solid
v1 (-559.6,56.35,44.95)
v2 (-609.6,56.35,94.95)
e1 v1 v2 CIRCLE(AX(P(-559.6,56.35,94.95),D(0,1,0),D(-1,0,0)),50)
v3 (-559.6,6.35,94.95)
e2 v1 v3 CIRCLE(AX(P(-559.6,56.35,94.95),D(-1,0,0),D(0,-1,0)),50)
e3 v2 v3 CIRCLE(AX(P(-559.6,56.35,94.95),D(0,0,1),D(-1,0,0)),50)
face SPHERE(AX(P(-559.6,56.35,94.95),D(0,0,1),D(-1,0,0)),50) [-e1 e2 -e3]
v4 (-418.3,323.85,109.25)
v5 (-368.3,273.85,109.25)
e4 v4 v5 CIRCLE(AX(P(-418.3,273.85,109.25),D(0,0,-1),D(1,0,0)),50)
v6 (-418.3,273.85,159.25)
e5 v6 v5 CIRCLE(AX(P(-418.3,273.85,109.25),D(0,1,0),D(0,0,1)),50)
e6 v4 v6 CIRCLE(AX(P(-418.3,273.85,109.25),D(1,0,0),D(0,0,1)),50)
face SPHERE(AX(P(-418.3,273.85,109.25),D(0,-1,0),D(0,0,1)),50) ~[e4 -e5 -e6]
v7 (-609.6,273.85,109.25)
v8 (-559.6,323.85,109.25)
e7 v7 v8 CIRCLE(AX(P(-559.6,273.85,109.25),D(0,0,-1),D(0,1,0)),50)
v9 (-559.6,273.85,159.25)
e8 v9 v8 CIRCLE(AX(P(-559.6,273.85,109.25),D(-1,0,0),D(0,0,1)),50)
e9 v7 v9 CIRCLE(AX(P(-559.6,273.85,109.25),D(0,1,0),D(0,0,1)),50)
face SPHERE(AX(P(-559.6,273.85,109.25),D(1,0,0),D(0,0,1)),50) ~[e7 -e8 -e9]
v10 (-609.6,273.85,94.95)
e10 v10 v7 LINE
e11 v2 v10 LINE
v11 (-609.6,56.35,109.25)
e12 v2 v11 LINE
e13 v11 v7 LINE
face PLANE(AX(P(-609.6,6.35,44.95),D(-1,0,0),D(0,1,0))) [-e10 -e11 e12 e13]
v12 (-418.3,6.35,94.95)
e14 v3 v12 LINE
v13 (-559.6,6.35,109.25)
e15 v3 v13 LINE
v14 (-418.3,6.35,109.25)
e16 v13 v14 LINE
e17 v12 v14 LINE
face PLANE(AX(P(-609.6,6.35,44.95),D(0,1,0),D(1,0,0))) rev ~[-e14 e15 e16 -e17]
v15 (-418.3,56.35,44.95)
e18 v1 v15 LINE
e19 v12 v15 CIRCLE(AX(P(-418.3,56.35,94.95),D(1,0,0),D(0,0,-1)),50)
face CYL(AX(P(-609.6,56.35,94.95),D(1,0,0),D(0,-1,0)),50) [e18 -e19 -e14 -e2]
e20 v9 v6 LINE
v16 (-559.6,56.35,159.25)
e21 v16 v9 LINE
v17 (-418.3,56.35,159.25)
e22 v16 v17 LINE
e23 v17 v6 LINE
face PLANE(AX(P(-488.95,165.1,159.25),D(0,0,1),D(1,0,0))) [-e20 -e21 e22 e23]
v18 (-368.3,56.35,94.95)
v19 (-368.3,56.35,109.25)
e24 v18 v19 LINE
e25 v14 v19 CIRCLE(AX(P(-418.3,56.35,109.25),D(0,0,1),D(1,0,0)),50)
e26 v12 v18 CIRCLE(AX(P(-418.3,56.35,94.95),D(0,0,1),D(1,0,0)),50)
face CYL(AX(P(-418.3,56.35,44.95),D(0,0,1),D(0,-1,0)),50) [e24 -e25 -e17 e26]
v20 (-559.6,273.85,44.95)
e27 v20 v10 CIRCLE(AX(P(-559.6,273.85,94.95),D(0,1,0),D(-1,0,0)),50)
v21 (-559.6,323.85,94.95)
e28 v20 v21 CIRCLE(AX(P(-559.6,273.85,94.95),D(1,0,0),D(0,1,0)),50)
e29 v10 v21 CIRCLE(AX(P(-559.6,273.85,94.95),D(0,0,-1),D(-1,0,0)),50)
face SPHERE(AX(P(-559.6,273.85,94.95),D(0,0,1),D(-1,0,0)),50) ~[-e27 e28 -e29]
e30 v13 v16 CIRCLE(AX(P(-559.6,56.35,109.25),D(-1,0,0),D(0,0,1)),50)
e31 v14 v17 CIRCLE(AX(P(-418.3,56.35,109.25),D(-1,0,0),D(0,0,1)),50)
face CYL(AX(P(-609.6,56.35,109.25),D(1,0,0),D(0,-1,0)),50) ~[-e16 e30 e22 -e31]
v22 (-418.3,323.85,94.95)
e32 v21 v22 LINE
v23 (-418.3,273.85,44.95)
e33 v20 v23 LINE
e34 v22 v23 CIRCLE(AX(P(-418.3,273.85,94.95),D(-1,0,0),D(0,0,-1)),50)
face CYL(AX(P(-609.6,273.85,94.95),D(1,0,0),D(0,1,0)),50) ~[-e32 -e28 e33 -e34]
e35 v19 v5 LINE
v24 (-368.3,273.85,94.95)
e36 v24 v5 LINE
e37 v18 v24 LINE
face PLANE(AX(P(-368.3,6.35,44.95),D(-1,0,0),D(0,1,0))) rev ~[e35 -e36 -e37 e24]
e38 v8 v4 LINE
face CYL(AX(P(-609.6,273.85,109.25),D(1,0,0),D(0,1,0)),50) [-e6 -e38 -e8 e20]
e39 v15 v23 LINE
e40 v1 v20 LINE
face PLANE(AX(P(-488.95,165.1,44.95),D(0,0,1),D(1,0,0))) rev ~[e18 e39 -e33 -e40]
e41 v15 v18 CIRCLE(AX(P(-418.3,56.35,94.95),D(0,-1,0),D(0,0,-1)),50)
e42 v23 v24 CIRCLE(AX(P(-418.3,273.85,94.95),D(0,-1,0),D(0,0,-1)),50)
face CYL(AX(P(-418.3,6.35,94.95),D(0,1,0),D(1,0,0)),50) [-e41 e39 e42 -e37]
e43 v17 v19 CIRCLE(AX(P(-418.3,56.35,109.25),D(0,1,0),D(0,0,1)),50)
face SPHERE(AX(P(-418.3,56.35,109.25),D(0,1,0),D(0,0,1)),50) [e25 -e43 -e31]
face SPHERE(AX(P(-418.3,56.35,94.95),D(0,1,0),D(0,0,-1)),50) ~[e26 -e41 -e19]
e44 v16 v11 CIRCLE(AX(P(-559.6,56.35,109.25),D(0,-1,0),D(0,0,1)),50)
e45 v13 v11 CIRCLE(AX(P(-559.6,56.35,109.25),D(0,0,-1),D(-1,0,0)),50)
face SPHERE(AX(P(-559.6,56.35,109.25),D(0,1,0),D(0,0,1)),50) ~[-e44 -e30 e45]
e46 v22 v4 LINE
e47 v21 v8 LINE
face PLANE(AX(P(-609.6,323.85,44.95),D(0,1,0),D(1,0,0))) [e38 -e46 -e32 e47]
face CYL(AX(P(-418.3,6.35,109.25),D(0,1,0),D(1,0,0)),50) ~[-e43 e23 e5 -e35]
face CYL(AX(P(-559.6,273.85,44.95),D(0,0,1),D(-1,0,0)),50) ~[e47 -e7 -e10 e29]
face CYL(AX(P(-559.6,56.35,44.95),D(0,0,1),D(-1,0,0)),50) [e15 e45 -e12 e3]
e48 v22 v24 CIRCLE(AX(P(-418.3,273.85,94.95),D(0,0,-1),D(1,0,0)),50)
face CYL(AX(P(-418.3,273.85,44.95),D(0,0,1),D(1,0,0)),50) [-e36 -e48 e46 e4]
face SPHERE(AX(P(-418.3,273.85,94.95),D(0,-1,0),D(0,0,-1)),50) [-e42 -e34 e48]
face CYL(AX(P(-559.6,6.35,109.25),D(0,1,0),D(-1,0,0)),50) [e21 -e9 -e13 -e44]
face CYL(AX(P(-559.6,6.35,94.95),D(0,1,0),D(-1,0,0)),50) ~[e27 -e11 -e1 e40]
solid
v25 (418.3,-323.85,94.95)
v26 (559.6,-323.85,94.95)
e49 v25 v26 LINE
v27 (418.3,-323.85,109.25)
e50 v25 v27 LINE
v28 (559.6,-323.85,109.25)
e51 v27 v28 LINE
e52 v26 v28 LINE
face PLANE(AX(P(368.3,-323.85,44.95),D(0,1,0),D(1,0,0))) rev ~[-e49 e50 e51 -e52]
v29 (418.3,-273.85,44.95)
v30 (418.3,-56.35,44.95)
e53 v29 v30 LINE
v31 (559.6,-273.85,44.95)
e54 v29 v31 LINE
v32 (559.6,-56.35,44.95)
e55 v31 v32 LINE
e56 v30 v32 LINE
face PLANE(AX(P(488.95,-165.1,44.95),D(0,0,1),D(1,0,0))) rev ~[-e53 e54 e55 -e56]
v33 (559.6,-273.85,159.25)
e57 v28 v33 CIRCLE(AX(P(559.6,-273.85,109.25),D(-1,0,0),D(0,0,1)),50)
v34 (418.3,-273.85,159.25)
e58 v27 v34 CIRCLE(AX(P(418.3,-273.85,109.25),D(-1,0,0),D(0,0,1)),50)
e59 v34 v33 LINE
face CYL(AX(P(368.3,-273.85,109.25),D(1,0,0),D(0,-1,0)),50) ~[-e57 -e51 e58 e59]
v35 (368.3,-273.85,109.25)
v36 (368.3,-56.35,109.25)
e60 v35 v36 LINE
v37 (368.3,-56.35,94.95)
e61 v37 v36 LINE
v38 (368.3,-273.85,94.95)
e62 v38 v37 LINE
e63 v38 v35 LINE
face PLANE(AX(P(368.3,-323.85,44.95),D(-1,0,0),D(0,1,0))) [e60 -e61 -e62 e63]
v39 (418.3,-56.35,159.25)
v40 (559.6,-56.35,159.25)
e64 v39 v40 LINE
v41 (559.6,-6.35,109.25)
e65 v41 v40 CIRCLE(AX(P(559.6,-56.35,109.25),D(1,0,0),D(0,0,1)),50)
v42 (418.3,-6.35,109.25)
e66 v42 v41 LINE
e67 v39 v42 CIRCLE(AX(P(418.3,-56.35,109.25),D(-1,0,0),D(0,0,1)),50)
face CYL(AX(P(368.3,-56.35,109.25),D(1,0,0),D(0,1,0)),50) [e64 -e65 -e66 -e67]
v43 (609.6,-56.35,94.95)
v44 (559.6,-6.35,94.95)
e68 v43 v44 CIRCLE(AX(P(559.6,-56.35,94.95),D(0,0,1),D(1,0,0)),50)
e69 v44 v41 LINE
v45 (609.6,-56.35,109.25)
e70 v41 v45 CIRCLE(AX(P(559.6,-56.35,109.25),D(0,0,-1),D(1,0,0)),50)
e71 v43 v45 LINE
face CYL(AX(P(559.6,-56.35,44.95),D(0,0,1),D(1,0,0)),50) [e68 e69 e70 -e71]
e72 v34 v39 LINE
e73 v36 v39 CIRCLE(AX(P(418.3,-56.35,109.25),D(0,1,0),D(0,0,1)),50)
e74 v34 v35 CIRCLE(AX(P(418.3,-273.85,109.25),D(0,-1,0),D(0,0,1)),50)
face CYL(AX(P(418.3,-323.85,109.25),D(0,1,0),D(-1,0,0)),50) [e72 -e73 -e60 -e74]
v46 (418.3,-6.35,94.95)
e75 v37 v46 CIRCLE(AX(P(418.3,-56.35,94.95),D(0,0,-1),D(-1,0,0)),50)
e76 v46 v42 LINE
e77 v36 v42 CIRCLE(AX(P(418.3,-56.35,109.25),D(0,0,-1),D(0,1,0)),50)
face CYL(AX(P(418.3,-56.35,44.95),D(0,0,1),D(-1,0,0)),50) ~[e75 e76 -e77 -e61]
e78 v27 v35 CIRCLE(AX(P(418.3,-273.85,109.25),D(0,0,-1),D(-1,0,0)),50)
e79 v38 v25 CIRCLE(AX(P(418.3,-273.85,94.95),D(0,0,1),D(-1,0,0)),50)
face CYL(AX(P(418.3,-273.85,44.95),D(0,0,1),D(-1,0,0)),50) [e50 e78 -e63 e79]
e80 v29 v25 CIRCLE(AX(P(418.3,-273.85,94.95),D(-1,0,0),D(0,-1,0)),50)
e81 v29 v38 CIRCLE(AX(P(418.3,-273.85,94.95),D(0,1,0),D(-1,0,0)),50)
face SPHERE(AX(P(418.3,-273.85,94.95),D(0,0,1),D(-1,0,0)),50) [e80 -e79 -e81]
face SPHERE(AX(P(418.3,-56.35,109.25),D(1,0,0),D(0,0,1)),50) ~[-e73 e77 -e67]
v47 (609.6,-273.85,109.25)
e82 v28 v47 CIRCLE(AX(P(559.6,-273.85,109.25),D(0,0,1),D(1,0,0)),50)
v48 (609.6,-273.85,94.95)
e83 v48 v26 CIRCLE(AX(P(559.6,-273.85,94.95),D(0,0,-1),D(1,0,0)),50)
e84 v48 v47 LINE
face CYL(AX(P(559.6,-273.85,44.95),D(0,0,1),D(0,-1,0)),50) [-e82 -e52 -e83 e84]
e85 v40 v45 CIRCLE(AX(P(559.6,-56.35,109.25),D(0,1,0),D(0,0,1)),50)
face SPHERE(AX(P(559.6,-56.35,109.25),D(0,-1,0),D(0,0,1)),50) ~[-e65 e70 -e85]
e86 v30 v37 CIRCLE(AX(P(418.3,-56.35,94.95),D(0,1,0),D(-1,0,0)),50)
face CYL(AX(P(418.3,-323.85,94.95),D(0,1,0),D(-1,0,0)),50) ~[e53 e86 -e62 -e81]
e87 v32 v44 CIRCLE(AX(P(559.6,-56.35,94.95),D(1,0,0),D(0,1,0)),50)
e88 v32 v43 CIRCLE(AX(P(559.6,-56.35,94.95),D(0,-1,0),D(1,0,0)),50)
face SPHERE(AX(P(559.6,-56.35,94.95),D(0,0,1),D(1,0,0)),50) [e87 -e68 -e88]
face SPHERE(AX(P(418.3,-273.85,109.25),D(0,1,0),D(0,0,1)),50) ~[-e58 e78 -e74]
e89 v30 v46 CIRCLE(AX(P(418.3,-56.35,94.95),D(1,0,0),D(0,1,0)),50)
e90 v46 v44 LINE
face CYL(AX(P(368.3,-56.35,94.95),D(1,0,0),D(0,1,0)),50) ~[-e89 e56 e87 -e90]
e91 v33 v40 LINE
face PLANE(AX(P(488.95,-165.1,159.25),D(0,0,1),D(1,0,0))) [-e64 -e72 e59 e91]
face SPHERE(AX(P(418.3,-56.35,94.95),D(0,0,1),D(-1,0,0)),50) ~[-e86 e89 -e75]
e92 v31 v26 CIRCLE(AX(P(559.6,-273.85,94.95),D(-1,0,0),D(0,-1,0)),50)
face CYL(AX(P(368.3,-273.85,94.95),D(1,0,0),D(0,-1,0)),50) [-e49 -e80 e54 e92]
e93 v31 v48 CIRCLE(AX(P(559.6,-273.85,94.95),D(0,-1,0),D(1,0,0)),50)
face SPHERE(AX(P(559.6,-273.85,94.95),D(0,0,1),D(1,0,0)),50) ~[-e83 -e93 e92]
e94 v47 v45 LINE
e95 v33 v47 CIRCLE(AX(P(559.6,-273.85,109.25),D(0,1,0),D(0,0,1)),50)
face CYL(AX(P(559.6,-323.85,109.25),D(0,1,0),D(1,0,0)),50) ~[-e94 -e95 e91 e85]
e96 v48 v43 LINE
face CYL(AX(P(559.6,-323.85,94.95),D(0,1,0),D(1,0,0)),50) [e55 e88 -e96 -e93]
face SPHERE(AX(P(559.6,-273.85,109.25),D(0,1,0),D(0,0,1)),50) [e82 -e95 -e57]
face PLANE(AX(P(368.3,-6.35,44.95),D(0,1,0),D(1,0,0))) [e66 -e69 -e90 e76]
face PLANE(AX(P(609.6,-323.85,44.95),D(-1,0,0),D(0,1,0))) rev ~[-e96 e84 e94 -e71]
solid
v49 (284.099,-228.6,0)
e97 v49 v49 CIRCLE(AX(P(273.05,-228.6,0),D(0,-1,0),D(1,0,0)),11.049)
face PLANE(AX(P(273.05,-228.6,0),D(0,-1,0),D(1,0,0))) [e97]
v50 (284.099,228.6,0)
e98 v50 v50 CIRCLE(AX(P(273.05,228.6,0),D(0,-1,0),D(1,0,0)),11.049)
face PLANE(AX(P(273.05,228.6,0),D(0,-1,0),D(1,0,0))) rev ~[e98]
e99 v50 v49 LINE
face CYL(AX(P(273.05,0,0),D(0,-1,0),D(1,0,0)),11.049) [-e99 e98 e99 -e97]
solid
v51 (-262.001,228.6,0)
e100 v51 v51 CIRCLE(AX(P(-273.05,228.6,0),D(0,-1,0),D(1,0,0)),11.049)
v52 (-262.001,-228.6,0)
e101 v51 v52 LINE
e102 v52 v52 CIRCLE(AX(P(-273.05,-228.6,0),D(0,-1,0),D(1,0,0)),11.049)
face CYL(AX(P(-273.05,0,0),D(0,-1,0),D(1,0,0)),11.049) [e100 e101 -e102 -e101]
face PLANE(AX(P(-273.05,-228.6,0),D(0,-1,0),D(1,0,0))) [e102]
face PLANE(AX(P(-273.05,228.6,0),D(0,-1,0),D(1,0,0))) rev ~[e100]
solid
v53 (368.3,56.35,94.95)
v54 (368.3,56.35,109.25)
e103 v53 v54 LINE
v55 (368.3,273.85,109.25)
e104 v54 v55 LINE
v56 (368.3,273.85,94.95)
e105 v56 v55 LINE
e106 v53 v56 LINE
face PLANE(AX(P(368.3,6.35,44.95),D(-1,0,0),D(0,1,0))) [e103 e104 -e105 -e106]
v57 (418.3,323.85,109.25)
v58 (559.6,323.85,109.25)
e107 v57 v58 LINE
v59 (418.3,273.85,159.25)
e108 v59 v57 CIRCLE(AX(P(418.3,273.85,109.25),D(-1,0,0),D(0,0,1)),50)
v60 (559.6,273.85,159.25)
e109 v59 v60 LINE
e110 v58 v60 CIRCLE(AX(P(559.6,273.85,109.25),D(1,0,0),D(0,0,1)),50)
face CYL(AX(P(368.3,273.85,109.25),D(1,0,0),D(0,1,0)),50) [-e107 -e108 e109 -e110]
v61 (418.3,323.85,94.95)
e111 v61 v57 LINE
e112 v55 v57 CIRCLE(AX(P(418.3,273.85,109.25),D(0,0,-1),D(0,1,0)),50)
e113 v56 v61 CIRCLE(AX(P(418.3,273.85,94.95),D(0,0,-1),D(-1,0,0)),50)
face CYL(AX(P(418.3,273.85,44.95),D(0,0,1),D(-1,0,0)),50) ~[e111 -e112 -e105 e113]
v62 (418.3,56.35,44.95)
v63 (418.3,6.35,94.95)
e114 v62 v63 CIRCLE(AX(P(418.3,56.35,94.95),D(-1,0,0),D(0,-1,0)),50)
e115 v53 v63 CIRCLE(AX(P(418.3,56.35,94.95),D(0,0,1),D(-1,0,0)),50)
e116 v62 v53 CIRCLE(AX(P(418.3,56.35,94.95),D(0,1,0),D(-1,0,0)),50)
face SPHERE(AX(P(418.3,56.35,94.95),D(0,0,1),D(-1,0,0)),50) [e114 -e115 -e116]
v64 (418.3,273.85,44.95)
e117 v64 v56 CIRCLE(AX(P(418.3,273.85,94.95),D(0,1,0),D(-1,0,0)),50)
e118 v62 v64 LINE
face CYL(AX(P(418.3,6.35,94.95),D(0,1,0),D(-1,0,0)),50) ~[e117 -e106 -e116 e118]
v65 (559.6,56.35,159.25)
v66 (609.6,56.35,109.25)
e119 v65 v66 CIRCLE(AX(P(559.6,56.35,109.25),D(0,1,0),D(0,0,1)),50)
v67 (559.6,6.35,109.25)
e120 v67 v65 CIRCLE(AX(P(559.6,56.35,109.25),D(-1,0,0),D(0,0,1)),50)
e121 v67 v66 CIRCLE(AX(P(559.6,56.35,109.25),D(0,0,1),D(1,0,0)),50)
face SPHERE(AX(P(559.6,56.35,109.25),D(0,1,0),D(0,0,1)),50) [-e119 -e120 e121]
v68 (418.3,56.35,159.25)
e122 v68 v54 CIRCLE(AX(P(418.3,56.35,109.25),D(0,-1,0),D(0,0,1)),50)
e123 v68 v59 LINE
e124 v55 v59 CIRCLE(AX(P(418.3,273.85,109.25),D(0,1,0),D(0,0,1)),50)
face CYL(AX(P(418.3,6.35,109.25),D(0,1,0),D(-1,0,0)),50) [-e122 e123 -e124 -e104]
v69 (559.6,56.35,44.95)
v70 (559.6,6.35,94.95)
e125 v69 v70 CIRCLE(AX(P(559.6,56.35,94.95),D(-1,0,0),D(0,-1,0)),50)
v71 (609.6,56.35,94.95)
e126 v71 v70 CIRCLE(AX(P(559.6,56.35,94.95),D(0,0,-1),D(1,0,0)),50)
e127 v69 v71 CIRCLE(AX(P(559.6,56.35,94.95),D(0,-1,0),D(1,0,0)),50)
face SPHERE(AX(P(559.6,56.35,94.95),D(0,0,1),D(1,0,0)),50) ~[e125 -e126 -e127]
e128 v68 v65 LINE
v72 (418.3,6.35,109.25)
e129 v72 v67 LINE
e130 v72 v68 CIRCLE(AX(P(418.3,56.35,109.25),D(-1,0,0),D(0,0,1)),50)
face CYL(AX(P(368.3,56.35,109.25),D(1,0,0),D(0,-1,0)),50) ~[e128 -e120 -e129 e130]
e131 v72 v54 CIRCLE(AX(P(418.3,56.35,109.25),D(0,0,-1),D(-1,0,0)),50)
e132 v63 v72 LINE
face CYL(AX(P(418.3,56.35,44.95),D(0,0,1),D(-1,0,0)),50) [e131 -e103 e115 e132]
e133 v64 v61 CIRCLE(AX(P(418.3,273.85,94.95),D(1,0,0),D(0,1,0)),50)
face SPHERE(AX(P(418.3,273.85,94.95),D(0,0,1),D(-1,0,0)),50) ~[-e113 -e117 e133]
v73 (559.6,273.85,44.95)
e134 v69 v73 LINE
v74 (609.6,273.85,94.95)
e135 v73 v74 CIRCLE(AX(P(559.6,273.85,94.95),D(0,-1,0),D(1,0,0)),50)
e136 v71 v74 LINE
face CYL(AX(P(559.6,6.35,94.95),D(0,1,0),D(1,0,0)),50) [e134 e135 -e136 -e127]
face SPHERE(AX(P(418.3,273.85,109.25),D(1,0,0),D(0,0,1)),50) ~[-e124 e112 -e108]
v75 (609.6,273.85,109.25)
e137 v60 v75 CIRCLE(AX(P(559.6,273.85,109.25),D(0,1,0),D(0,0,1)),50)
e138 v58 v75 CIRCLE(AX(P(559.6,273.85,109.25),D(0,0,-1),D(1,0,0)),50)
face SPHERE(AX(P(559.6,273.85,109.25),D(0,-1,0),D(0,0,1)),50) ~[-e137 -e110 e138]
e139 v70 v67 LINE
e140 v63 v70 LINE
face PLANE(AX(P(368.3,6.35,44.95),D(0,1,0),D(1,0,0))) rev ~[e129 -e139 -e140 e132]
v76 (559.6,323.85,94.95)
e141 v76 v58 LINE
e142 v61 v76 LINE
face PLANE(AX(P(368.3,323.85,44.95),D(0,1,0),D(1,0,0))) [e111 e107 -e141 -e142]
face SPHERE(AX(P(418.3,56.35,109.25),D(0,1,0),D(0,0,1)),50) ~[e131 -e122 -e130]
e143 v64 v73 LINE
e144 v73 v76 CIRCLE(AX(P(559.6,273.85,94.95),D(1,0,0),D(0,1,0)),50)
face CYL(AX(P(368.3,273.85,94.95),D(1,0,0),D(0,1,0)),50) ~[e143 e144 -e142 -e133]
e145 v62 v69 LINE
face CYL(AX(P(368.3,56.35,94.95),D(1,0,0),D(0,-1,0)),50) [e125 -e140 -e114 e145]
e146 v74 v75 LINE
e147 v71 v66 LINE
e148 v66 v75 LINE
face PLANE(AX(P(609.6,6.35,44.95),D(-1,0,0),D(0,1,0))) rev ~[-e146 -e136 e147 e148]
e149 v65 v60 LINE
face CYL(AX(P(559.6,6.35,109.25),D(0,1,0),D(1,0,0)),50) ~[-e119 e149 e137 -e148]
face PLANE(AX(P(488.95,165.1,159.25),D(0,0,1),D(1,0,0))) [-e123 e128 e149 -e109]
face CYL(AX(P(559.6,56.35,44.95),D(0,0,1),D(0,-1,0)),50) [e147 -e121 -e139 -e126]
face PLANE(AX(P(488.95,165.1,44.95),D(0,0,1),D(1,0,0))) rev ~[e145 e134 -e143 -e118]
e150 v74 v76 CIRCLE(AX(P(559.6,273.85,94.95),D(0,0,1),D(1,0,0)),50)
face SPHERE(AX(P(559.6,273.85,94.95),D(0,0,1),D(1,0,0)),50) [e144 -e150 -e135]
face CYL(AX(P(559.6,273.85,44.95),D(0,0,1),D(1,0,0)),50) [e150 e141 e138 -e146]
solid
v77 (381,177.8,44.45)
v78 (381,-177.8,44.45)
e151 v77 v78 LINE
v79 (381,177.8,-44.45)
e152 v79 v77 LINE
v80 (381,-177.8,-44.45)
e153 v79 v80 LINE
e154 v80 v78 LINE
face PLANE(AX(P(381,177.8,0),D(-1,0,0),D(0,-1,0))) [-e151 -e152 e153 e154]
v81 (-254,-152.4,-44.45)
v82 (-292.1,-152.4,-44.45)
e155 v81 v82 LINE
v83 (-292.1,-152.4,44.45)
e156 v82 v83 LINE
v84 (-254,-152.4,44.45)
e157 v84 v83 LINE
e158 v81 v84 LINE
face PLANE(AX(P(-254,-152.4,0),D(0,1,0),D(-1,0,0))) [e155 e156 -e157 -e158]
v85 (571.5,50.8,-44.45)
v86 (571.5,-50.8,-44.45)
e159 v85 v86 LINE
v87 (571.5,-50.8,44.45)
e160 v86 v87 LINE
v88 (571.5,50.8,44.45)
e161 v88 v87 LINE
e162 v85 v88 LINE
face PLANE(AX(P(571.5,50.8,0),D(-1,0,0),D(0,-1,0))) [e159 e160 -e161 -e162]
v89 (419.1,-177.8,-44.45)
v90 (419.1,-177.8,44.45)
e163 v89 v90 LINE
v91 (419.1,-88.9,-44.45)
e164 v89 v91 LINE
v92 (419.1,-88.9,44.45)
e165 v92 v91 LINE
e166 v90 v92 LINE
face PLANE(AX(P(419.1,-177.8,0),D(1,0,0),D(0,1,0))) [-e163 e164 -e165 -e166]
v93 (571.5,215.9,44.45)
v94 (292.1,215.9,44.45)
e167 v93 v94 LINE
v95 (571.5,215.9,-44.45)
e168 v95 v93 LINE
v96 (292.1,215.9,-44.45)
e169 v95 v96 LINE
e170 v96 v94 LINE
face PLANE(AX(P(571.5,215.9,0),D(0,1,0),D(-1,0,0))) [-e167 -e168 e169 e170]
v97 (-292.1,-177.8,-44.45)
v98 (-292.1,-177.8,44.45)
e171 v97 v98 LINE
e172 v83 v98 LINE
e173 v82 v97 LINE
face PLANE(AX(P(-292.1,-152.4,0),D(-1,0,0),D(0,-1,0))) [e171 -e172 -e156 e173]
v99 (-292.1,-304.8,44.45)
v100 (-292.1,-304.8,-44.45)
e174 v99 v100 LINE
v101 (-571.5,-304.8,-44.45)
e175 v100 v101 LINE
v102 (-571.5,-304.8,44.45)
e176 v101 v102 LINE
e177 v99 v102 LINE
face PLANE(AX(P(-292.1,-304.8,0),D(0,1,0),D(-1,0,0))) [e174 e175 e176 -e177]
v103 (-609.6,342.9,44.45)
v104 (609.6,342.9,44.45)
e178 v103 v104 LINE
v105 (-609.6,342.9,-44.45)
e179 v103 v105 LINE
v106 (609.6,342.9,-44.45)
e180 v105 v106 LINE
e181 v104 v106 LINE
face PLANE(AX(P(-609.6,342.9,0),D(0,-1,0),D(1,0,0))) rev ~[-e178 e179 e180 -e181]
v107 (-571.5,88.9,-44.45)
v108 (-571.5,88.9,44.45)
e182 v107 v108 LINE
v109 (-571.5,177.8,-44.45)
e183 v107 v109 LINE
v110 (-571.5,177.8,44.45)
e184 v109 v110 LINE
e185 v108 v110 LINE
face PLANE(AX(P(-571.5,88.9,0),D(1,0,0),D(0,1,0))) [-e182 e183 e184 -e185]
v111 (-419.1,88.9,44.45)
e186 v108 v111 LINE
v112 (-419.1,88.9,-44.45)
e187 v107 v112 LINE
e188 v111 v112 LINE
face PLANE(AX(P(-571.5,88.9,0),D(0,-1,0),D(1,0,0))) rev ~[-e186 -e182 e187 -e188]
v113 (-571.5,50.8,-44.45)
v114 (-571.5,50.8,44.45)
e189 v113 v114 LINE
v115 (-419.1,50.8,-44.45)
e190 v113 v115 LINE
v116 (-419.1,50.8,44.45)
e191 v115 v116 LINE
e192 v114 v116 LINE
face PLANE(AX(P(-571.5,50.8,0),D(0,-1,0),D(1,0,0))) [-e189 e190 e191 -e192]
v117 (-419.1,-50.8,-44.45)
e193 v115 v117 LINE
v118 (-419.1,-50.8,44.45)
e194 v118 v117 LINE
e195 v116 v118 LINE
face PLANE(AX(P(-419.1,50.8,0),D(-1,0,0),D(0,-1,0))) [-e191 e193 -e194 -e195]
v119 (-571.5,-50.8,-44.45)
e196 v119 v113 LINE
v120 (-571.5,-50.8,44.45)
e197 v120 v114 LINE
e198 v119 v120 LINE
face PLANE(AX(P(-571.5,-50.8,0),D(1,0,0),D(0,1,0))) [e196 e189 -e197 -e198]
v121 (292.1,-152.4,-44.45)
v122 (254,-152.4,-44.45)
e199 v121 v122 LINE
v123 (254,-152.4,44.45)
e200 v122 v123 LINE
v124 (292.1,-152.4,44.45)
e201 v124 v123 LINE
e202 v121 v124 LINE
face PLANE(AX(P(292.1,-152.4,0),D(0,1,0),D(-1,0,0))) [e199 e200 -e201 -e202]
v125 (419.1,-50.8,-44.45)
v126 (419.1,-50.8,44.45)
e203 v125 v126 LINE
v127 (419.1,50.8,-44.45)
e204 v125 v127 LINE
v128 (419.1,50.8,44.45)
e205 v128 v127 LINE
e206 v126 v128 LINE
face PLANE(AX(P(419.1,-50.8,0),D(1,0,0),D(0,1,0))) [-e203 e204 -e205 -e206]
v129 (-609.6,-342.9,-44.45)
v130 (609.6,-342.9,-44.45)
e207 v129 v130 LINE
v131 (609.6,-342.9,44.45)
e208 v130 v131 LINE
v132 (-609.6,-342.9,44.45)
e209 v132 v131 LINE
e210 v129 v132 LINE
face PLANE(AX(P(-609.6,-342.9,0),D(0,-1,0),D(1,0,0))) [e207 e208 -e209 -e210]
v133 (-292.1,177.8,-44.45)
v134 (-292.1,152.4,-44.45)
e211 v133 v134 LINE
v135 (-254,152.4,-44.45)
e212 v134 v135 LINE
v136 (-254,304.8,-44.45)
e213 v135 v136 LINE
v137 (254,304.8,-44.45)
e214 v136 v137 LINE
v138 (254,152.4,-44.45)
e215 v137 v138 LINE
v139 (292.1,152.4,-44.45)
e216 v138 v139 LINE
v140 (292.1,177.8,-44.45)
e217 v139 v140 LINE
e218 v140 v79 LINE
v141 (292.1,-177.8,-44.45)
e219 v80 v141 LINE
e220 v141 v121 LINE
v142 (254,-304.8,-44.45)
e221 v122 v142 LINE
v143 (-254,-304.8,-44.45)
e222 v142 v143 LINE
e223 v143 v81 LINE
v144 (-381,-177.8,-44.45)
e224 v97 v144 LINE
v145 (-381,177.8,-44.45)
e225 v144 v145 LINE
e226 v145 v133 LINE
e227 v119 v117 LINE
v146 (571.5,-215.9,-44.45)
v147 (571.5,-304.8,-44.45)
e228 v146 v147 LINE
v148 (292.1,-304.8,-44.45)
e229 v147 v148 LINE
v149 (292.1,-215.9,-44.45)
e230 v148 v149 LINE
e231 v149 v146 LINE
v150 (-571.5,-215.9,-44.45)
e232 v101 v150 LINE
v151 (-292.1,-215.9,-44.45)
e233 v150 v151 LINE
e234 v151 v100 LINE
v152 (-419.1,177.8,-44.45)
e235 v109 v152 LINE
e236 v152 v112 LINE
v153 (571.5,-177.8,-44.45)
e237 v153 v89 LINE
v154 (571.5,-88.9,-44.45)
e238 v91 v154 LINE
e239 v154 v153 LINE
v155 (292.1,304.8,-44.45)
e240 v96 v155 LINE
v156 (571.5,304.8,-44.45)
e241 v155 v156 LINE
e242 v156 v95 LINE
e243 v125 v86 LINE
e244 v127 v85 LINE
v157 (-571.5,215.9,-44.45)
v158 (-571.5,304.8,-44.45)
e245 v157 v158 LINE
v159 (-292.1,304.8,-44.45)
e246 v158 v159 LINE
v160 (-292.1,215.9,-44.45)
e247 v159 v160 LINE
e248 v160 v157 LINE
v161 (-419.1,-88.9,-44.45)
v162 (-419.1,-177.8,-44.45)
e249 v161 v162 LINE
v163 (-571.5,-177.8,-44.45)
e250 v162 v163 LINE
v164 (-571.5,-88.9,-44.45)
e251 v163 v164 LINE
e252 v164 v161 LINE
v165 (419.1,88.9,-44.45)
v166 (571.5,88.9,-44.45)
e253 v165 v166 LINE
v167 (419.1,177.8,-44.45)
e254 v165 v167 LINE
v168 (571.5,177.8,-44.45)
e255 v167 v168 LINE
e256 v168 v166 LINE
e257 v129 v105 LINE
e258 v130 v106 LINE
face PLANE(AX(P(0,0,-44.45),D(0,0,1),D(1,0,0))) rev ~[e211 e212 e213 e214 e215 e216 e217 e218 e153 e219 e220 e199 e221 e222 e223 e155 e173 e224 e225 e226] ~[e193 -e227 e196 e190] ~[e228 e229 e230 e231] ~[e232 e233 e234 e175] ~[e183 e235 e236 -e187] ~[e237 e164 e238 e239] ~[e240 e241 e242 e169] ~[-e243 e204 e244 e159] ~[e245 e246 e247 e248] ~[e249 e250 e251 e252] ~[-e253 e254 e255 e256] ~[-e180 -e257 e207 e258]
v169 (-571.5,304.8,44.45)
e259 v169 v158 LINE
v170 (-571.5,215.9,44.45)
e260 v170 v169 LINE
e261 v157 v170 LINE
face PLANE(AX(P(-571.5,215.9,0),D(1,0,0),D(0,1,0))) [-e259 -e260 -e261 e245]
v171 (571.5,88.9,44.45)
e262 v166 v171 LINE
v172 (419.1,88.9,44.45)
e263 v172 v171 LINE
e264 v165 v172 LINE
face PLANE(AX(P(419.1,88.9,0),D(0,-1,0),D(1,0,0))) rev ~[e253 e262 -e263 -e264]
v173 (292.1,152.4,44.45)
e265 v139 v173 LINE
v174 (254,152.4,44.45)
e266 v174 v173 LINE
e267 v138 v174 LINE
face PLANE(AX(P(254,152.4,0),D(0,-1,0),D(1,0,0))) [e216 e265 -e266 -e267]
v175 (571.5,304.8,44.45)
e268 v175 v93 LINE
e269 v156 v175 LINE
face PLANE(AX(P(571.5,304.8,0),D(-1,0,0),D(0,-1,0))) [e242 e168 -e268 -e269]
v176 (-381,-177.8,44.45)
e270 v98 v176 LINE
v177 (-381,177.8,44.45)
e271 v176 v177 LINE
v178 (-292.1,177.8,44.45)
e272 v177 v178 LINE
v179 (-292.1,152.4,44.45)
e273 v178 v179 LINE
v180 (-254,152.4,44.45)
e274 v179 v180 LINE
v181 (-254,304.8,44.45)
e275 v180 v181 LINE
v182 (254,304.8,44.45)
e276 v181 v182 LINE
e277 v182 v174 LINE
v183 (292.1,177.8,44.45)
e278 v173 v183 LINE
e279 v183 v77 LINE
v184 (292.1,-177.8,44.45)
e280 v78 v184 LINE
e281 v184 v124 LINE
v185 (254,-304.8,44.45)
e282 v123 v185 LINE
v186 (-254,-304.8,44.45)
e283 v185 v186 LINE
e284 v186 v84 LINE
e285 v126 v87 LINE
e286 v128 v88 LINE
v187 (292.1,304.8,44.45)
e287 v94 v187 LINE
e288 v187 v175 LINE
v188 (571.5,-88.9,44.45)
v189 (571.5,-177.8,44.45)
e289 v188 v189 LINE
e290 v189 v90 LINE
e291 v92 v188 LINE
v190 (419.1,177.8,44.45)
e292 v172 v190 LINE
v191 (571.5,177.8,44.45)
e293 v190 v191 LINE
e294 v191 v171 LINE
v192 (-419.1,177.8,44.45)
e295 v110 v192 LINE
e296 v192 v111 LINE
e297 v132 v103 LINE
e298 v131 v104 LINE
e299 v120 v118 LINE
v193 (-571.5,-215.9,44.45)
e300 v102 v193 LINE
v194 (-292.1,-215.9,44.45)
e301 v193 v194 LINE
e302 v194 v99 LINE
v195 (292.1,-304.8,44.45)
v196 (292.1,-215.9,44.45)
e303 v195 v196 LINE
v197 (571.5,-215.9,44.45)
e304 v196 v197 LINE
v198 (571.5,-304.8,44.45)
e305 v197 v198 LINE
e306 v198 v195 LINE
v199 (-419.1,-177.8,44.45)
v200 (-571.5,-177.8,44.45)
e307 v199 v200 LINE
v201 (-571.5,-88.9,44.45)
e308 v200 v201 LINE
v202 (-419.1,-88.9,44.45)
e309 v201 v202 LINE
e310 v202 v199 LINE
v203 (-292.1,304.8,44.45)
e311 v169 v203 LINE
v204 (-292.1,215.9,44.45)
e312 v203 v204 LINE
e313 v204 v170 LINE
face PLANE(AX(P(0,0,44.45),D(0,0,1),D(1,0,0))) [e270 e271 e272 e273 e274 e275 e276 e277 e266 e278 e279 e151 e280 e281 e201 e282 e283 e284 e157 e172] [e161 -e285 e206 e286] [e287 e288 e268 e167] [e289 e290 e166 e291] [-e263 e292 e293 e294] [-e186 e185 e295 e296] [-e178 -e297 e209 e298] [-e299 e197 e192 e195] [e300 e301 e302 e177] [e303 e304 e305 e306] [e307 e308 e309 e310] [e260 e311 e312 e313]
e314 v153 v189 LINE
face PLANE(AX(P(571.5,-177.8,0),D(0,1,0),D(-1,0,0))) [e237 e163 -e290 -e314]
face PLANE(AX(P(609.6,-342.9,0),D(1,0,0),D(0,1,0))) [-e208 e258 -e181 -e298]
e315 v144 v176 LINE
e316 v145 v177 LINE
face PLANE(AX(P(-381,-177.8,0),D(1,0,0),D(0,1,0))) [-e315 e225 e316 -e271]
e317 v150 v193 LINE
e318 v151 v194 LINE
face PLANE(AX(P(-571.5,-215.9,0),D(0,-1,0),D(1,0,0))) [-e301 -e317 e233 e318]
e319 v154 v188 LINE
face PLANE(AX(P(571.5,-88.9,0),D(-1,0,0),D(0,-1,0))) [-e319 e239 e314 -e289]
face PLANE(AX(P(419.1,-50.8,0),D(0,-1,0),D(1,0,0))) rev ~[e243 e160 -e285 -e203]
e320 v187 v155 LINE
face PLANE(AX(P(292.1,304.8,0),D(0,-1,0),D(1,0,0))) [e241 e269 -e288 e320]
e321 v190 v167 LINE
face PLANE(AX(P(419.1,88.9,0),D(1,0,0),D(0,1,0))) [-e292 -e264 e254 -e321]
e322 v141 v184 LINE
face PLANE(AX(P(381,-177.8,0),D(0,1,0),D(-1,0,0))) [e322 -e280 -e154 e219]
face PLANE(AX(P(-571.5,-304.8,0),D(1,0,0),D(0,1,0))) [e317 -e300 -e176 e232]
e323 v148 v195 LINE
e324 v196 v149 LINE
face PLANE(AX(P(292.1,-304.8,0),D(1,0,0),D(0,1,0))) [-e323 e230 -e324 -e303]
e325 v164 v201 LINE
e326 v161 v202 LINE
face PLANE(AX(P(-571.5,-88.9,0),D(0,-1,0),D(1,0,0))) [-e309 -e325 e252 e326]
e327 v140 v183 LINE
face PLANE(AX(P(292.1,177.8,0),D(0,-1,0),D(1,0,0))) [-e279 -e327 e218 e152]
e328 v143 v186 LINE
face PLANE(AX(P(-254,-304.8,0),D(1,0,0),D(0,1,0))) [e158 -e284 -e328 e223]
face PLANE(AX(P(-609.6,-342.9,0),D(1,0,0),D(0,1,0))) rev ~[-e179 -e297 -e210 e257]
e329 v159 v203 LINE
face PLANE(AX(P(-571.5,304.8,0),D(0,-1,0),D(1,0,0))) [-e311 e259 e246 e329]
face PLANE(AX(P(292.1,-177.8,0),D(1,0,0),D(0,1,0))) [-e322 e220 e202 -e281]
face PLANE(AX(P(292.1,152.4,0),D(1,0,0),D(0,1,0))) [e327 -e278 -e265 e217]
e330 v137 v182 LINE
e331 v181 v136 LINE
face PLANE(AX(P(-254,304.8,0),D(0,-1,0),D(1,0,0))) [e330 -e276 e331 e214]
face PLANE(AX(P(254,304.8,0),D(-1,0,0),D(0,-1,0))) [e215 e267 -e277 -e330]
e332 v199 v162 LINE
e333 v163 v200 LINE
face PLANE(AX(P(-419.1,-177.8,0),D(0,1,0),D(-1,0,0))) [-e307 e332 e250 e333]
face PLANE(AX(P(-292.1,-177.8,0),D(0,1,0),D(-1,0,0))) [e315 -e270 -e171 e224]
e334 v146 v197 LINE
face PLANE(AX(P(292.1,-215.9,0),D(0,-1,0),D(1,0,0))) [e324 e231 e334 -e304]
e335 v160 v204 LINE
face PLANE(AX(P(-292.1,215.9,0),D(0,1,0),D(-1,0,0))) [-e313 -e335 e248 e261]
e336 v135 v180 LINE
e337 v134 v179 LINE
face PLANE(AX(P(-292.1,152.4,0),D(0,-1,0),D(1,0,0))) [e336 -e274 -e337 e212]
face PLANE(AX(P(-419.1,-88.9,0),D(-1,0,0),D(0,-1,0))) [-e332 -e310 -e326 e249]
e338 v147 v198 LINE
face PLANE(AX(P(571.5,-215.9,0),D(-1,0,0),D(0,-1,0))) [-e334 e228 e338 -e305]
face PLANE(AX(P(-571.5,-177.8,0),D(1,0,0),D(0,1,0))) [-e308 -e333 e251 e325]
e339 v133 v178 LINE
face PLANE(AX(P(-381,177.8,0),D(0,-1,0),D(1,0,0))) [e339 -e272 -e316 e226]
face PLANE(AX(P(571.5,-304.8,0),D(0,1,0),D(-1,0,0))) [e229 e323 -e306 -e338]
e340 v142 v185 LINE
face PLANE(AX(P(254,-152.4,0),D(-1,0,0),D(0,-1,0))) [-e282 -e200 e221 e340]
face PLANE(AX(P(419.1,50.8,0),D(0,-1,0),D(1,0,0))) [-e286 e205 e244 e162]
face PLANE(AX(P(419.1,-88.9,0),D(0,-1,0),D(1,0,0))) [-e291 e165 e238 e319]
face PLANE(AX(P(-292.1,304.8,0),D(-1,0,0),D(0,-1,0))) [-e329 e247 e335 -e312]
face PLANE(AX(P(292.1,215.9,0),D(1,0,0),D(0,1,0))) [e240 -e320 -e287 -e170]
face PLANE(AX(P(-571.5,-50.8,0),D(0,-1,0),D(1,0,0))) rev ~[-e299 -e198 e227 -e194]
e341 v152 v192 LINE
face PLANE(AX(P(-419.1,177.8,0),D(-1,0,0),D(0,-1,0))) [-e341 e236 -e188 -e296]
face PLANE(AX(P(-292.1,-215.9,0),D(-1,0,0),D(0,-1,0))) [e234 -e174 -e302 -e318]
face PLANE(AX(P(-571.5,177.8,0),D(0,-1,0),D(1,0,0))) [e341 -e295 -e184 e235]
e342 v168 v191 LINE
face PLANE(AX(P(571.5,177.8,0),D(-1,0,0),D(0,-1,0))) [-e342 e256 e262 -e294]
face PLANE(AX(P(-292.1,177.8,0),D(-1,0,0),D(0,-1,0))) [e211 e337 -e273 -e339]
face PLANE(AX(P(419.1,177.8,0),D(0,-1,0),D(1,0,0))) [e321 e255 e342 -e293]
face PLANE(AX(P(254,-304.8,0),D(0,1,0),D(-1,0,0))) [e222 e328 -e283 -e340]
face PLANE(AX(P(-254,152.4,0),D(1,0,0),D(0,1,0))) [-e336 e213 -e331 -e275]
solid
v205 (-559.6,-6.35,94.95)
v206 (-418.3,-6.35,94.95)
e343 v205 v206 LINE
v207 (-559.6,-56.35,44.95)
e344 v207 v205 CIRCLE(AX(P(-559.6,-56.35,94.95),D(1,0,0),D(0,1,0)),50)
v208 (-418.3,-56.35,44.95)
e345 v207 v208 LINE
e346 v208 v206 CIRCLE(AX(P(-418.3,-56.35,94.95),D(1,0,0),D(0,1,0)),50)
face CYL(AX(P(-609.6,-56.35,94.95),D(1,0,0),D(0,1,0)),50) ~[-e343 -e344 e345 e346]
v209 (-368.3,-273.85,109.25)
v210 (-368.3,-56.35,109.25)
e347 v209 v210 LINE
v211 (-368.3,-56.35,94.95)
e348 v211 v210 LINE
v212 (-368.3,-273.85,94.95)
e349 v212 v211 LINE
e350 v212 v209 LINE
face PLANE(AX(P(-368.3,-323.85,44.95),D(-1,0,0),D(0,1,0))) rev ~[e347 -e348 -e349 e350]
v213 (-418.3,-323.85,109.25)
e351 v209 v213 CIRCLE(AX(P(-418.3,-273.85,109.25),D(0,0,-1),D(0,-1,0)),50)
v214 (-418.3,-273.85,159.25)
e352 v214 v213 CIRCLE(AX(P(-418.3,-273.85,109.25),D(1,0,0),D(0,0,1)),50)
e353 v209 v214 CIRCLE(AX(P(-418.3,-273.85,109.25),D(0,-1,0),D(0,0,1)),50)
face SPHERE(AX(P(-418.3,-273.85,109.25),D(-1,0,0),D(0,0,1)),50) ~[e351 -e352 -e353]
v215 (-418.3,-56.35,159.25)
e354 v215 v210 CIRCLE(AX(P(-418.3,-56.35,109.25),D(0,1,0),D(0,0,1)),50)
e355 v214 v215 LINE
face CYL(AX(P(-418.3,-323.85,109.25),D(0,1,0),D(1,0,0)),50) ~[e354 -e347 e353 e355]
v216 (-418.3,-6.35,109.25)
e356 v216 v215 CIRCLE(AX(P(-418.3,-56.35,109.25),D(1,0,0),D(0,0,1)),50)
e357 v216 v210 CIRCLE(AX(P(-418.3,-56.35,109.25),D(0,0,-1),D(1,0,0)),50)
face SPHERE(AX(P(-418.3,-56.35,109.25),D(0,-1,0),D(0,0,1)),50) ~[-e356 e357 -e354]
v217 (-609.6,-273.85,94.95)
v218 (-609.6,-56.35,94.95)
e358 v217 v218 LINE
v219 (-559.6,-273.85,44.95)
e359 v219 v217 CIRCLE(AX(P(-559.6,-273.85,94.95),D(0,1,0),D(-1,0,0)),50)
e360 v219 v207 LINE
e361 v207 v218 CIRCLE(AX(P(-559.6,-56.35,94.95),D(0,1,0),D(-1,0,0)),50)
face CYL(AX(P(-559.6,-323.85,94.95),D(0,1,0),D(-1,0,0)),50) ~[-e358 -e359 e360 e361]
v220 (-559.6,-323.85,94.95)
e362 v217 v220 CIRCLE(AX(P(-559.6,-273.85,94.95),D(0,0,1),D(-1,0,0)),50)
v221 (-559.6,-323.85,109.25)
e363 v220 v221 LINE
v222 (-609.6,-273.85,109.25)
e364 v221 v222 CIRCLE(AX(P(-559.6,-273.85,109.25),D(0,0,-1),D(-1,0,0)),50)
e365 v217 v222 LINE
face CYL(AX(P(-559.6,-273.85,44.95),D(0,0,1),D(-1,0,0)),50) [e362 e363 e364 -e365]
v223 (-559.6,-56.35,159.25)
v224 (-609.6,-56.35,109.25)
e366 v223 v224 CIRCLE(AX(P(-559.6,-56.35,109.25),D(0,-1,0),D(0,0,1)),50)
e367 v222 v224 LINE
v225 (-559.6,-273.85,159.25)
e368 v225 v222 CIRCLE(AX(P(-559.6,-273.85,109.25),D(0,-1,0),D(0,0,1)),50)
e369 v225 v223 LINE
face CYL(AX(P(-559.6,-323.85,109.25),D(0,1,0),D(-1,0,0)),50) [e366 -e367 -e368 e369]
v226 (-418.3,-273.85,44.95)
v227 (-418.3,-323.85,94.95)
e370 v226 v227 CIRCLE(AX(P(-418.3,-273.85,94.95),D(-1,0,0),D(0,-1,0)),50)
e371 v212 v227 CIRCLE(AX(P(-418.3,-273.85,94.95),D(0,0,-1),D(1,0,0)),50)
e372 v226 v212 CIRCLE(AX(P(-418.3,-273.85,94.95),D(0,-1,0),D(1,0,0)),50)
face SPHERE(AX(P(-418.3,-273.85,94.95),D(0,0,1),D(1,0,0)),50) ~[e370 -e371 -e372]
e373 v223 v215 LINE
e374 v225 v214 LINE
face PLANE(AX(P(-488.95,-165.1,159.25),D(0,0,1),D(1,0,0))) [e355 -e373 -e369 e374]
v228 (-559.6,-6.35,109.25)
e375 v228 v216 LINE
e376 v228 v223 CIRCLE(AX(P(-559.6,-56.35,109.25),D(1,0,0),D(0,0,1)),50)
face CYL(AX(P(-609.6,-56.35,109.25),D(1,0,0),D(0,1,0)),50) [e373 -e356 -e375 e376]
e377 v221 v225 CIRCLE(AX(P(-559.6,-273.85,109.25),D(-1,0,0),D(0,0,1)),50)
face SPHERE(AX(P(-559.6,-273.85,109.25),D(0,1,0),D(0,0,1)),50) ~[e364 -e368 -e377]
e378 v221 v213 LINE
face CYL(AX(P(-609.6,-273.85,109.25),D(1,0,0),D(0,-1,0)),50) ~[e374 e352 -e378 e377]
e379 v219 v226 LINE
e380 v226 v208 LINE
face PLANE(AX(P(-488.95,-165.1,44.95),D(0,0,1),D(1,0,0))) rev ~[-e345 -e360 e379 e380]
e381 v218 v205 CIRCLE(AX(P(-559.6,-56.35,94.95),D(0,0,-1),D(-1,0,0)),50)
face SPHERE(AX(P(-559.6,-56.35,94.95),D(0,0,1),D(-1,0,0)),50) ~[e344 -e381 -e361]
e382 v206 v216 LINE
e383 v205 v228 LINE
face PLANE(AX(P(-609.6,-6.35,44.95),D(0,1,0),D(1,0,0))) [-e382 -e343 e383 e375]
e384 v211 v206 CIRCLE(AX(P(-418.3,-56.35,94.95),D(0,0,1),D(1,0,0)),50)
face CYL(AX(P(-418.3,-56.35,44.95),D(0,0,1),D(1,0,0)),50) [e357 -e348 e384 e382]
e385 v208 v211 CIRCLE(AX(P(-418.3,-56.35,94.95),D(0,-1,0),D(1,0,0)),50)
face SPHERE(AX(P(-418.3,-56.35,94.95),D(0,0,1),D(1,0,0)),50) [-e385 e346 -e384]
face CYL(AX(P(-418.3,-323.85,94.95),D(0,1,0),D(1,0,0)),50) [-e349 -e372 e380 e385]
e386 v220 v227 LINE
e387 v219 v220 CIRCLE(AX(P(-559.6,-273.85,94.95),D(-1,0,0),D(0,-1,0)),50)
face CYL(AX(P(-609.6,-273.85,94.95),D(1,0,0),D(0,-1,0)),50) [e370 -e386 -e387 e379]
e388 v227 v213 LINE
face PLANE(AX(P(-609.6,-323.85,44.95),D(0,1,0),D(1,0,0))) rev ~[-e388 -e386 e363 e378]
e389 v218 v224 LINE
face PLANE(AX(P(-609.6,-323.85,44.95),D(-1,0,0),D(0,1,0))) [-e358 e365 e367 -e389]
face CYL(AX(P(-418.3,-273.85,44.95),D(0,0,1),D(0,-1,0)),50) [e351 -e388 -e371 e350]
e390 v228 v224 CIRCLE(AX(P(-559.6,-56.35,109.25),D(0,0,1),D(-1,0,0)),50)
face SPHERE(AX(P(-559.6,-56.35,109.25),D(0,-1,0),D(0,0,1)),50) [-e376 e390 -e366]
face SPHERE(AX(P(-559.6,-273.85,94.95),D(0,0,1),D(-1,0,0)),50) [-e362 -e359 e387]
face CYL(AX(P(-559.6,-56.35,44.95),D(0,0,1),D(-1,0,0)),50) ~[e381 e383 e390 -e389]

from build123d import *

# Parameters (mm, degrees)
F0_W     = 1219.2
F0_H     = 685.8
F0_W_2   = 152.4
F0_H_2   = 38.1
F1_DEPTH = 44.45
F3_W     = 241.3
F3_H     = 317.5
F4_DEPTH = 114.3
F5_R     = 50
F5_2_R   = 50
F5_3_R   = 50
F5_4_R   = 50
F6_R     = 11.049
F7_DEPTH = 228.6


# Not quite as in the source:
# - a feature names something its author has since deleted; it is built from what else it names


with BuildPart() as f1:
    # F0 (on Top) → F1 (new body, symmetric)
    with BuildSketch(Plane.XY):
        Rectangle(F0_W, F0_H)
        Polygon((292.1, 304.8), (571.5, 304.8), (571.5, 215.9), (571.5, 177.8), (571.5, 88.9), (571.5, 50.8), (571.5, -50.8), (571.5, -88.9), (571.5, -177.8), (571.5, -215.9), (571.5, -304.8), (292.1, -304.8), (254, -304.8), (-254, -304.8), (-292.1, -304.8), (-571.5, -304.8), (-571.5, -215.9), (-571.5, -177.8), (-571.5, -88.9), (-571.5, -50.8), (-571.5, 50.8), (-571.5, 88.9), (-571.5, 177.8), (-571.5, 215.9), (-571.5, 304.8), (-292.1, 304.8), (-254, 304.8), (254, 304.8), align=None, mode=Mode.SUBTRACT)
        Polygon((-292.1, -177.8), (-381, -177.8), (-419.1, -177.8), (-571.5, -177.8), (-571.5, -215.9), (-292.1, -215.9), align=None)
        with Locations((-495.3, -69.85)):
            Rectangle(F0_W_2, F0_H_2)
        with Locations((-495.3, 69.85)):
            Rectangle(F0_W_2, F0_H_2)
        Polygon((-292.1, 177.8), (-292.1, 215.9), (-571.5, 215.9), (-571.5, 177.8), (-419.1, 177.8), (-381, 177.8), align=None)
        Polygon((571.5, 177.8), (571.5, 215.9), (292.1, 215.9), (292.1, 177.8), (381, 177.8), (419.1, 177.8), align=None)
        with Locations((495.3, 69.85)):
            Rectangle(F0_W_2, F0_H_2)
        with Locations((495.3, -69.85)):
            Rectangle(F0_W_2, F0_H_2)
        Polygon((419.1, -177.8), (381, -177.8), (292.1, -177.8), (292.1, -215.9), (571.5, -215.9), (571.5, -177.8), align=None)
        Polygon((-381, -177.8), (-381, 177.8), (-419.1, 177.8), (-419.1, 88.9), (-419.1, 50.8), (-419.1, -50.8), (-419.1, -88.9), (-419.1, -177.8), align=None)
        Polygon((-254, 152.4), (-254, 304.8), (-292.1, 304.8), (-292.1, 215.9), (-292.1, 177.8), (-292.1, 152.4), align=None)
        Polygon((-292.1, -152.4), (-292.1, -177.8), (-292.1, -215.9), (-292.1, -304.8), (-254, -304.8), (-254, -152.4), align=None)
        Polygon((292.1, -215.9), (292.1, -177.8), (292.1, -152.4), (254, -152.4), (254, -304.8), (292.1, -304.8), align=None)
        Polygon((292.1, 215.9), (292.1, 304.8), (254, 304.8), (254, 152.4), (292.1, 152.4), (292.1, 177.8), align=None)
        Polygon((419.1, 88.9), (419.1, 177.8), (381, 177.8), (381, -177.8), (419.1, -177.8), (419.1, -88.9), (419.1, -50.8), (419.1, 50.8), align=None)
    extrude(amount=F1_DEPTH, both=True)


with BuildPart() as f4:
    # F3 (on offset) → F4 (new body)
    with BuildSketch(Plane.XY.offset(44.95)):
        with Locations((488.95, 165.1)):
            Rectangle(F3_W, F3_H)
    extrude(amount=F4_DEPTH)

    # F5#4
    f5_4_edges = [f4.edges().sort_by_distance(p)[0] for p in [
        (609.6, 165.1, 159.25),
        (488.95, 323.85, 159.25),
        (368.3, 165.1, 159.25),
        (488.95, 6.35, 159.25),
        (368.3, 323.85, 102.1),
        (368.3, 6.35, 102.1),
        (368.3, 165.1, 44.95),
        (609.6, 6.35, 102.1),
        (609.6, 323.85, 102.1),
        (609.6, 165.1, 44.95),
        (488.95, 323.85, 44.95),
        (488.95, 6.35, 44.95),
    ]]
    fillet(f5_4_edges, radius=F5_4_R)


with BuildPart() as f4b:
    # F3 (on offset) → F4, piece 2 (new body)
    with BuildSketch(Plane.XY.offset(44.95)):
        with Locations((488.95, -165.1)):
            Rectangle(F3_W, F3_H)
    extrude(amount=F4_DEPTH)

    # F5#3
    f5_3_edges = [f4b.edges().sort_by_distance(p)[0] for p in [
        (609.6, -165.1, 159.25),
        (488.95, -6.35, 159.25),
        (368.3, -165.1, 159.25),
        (488.95, -323.85, 159.25),
        (368.3, -6.35, 102.1),
        (368.3, -323.85, 102.1),
        (368.3, -165.1, 44.95),
        (609.6, -323.85, 102.1),
        (609.6, -6.35, 102.1),
        (609.6, -165.1, 44.95),
        (488.95, -6.35, 44.95),
        (488.95, -323.85, 44.95),
    ]]
    fillet(f5_3_edges, radius=F5_3_R)


with BuildPart() as f4c:
    # F3 (on offset) → F4, piece 3 (new body)
    with BuildSketch(Plane.XY.offset(44.95)):
        with Locations((-488.95, -165.1)):
            Rectangle(F3_W, F3_H)
    extrude(amount=F4_DEPTH)

    # F5#2
    f5_2_edges = [f4c.edges().sort_by_distance(p)[0] for p in [
        (-609.6, -165.1, 159.25),
        (-488.95, -323.85, 159.25),
        (-368.3, -165.1, 159.25),
        (-488.95, -6.35, 159.25),
        (-609.6, -6.35, 102.1),
        (-609.6, -323.85, 102.1),
        (-609.6, -165.1, 44.95),
        (-368.3, -323.85, 102.1),
        (-368.3, -6.35, 102.1),
        (-368.3, -165.1, 44.95),
        (-488.95, -323.85, 44.95),
        (-488.95, -6.35, 44.95),
    ]]
    fillet(f5_2_edges, radius=F5_2_R)


with BuildPart() as f4d:
    # F3 (on offset) → F4, piece 4 (new body)
    with BuildSketch(Plane.XY.offset(44.95)):
        with Locations((-488.95, 165.1)):
            Rectangle(F3_W, F3_H)
    extrude(amount=F4_DEPTH)

    # F5
    f5_edges = [f4d.edges().sort_by_distance(p)[0] for p in [
        (-368.3, 165.1, 159.25),
        (-488.95, 323.85, 159.25),
        (-609.6, 165.1, 159.25),
        (-488.95, 6.35, 159.25),
        (-609.6, 323.85, 102.1),
        (-609.6, 6.35, 102.1),
        (-609.6, 165.1, 44.95),
        (-368.3, 165.1, 44.95),
        (-488.95, 323.85, 44.95),
        (-488.95, 6.35, 44.95),
        (-368.3, 6.35, 102.1),
        (-368.3, 323.85, 102.1),
    ]]
    fillet(f5_edges, radius=F5_R)


with BuildPart() as f7:
    # F6 (on Front) → F7 (new body, symmetric)
    with BuildSketch(Plane.XZ):
        with Locations((-273.05, 0)):
            Circle(F6_R)
    extrude(amount=F7_DEPTH, both=True)


with BuildPart() as f7b:
    # F6 (on Front) → F7, piece 2 (new body, symmetric)
    with BuildSketch(Plane.XZ):
        with Locations((273.05, 0)):
            Circle(F6_R)
    extrude(amount=F7_DEPTH, both=True)


solid = Compound([f1.part, f4.part, f4b.part, f4c.part, f4d.part, f7.part, f7b.part])
